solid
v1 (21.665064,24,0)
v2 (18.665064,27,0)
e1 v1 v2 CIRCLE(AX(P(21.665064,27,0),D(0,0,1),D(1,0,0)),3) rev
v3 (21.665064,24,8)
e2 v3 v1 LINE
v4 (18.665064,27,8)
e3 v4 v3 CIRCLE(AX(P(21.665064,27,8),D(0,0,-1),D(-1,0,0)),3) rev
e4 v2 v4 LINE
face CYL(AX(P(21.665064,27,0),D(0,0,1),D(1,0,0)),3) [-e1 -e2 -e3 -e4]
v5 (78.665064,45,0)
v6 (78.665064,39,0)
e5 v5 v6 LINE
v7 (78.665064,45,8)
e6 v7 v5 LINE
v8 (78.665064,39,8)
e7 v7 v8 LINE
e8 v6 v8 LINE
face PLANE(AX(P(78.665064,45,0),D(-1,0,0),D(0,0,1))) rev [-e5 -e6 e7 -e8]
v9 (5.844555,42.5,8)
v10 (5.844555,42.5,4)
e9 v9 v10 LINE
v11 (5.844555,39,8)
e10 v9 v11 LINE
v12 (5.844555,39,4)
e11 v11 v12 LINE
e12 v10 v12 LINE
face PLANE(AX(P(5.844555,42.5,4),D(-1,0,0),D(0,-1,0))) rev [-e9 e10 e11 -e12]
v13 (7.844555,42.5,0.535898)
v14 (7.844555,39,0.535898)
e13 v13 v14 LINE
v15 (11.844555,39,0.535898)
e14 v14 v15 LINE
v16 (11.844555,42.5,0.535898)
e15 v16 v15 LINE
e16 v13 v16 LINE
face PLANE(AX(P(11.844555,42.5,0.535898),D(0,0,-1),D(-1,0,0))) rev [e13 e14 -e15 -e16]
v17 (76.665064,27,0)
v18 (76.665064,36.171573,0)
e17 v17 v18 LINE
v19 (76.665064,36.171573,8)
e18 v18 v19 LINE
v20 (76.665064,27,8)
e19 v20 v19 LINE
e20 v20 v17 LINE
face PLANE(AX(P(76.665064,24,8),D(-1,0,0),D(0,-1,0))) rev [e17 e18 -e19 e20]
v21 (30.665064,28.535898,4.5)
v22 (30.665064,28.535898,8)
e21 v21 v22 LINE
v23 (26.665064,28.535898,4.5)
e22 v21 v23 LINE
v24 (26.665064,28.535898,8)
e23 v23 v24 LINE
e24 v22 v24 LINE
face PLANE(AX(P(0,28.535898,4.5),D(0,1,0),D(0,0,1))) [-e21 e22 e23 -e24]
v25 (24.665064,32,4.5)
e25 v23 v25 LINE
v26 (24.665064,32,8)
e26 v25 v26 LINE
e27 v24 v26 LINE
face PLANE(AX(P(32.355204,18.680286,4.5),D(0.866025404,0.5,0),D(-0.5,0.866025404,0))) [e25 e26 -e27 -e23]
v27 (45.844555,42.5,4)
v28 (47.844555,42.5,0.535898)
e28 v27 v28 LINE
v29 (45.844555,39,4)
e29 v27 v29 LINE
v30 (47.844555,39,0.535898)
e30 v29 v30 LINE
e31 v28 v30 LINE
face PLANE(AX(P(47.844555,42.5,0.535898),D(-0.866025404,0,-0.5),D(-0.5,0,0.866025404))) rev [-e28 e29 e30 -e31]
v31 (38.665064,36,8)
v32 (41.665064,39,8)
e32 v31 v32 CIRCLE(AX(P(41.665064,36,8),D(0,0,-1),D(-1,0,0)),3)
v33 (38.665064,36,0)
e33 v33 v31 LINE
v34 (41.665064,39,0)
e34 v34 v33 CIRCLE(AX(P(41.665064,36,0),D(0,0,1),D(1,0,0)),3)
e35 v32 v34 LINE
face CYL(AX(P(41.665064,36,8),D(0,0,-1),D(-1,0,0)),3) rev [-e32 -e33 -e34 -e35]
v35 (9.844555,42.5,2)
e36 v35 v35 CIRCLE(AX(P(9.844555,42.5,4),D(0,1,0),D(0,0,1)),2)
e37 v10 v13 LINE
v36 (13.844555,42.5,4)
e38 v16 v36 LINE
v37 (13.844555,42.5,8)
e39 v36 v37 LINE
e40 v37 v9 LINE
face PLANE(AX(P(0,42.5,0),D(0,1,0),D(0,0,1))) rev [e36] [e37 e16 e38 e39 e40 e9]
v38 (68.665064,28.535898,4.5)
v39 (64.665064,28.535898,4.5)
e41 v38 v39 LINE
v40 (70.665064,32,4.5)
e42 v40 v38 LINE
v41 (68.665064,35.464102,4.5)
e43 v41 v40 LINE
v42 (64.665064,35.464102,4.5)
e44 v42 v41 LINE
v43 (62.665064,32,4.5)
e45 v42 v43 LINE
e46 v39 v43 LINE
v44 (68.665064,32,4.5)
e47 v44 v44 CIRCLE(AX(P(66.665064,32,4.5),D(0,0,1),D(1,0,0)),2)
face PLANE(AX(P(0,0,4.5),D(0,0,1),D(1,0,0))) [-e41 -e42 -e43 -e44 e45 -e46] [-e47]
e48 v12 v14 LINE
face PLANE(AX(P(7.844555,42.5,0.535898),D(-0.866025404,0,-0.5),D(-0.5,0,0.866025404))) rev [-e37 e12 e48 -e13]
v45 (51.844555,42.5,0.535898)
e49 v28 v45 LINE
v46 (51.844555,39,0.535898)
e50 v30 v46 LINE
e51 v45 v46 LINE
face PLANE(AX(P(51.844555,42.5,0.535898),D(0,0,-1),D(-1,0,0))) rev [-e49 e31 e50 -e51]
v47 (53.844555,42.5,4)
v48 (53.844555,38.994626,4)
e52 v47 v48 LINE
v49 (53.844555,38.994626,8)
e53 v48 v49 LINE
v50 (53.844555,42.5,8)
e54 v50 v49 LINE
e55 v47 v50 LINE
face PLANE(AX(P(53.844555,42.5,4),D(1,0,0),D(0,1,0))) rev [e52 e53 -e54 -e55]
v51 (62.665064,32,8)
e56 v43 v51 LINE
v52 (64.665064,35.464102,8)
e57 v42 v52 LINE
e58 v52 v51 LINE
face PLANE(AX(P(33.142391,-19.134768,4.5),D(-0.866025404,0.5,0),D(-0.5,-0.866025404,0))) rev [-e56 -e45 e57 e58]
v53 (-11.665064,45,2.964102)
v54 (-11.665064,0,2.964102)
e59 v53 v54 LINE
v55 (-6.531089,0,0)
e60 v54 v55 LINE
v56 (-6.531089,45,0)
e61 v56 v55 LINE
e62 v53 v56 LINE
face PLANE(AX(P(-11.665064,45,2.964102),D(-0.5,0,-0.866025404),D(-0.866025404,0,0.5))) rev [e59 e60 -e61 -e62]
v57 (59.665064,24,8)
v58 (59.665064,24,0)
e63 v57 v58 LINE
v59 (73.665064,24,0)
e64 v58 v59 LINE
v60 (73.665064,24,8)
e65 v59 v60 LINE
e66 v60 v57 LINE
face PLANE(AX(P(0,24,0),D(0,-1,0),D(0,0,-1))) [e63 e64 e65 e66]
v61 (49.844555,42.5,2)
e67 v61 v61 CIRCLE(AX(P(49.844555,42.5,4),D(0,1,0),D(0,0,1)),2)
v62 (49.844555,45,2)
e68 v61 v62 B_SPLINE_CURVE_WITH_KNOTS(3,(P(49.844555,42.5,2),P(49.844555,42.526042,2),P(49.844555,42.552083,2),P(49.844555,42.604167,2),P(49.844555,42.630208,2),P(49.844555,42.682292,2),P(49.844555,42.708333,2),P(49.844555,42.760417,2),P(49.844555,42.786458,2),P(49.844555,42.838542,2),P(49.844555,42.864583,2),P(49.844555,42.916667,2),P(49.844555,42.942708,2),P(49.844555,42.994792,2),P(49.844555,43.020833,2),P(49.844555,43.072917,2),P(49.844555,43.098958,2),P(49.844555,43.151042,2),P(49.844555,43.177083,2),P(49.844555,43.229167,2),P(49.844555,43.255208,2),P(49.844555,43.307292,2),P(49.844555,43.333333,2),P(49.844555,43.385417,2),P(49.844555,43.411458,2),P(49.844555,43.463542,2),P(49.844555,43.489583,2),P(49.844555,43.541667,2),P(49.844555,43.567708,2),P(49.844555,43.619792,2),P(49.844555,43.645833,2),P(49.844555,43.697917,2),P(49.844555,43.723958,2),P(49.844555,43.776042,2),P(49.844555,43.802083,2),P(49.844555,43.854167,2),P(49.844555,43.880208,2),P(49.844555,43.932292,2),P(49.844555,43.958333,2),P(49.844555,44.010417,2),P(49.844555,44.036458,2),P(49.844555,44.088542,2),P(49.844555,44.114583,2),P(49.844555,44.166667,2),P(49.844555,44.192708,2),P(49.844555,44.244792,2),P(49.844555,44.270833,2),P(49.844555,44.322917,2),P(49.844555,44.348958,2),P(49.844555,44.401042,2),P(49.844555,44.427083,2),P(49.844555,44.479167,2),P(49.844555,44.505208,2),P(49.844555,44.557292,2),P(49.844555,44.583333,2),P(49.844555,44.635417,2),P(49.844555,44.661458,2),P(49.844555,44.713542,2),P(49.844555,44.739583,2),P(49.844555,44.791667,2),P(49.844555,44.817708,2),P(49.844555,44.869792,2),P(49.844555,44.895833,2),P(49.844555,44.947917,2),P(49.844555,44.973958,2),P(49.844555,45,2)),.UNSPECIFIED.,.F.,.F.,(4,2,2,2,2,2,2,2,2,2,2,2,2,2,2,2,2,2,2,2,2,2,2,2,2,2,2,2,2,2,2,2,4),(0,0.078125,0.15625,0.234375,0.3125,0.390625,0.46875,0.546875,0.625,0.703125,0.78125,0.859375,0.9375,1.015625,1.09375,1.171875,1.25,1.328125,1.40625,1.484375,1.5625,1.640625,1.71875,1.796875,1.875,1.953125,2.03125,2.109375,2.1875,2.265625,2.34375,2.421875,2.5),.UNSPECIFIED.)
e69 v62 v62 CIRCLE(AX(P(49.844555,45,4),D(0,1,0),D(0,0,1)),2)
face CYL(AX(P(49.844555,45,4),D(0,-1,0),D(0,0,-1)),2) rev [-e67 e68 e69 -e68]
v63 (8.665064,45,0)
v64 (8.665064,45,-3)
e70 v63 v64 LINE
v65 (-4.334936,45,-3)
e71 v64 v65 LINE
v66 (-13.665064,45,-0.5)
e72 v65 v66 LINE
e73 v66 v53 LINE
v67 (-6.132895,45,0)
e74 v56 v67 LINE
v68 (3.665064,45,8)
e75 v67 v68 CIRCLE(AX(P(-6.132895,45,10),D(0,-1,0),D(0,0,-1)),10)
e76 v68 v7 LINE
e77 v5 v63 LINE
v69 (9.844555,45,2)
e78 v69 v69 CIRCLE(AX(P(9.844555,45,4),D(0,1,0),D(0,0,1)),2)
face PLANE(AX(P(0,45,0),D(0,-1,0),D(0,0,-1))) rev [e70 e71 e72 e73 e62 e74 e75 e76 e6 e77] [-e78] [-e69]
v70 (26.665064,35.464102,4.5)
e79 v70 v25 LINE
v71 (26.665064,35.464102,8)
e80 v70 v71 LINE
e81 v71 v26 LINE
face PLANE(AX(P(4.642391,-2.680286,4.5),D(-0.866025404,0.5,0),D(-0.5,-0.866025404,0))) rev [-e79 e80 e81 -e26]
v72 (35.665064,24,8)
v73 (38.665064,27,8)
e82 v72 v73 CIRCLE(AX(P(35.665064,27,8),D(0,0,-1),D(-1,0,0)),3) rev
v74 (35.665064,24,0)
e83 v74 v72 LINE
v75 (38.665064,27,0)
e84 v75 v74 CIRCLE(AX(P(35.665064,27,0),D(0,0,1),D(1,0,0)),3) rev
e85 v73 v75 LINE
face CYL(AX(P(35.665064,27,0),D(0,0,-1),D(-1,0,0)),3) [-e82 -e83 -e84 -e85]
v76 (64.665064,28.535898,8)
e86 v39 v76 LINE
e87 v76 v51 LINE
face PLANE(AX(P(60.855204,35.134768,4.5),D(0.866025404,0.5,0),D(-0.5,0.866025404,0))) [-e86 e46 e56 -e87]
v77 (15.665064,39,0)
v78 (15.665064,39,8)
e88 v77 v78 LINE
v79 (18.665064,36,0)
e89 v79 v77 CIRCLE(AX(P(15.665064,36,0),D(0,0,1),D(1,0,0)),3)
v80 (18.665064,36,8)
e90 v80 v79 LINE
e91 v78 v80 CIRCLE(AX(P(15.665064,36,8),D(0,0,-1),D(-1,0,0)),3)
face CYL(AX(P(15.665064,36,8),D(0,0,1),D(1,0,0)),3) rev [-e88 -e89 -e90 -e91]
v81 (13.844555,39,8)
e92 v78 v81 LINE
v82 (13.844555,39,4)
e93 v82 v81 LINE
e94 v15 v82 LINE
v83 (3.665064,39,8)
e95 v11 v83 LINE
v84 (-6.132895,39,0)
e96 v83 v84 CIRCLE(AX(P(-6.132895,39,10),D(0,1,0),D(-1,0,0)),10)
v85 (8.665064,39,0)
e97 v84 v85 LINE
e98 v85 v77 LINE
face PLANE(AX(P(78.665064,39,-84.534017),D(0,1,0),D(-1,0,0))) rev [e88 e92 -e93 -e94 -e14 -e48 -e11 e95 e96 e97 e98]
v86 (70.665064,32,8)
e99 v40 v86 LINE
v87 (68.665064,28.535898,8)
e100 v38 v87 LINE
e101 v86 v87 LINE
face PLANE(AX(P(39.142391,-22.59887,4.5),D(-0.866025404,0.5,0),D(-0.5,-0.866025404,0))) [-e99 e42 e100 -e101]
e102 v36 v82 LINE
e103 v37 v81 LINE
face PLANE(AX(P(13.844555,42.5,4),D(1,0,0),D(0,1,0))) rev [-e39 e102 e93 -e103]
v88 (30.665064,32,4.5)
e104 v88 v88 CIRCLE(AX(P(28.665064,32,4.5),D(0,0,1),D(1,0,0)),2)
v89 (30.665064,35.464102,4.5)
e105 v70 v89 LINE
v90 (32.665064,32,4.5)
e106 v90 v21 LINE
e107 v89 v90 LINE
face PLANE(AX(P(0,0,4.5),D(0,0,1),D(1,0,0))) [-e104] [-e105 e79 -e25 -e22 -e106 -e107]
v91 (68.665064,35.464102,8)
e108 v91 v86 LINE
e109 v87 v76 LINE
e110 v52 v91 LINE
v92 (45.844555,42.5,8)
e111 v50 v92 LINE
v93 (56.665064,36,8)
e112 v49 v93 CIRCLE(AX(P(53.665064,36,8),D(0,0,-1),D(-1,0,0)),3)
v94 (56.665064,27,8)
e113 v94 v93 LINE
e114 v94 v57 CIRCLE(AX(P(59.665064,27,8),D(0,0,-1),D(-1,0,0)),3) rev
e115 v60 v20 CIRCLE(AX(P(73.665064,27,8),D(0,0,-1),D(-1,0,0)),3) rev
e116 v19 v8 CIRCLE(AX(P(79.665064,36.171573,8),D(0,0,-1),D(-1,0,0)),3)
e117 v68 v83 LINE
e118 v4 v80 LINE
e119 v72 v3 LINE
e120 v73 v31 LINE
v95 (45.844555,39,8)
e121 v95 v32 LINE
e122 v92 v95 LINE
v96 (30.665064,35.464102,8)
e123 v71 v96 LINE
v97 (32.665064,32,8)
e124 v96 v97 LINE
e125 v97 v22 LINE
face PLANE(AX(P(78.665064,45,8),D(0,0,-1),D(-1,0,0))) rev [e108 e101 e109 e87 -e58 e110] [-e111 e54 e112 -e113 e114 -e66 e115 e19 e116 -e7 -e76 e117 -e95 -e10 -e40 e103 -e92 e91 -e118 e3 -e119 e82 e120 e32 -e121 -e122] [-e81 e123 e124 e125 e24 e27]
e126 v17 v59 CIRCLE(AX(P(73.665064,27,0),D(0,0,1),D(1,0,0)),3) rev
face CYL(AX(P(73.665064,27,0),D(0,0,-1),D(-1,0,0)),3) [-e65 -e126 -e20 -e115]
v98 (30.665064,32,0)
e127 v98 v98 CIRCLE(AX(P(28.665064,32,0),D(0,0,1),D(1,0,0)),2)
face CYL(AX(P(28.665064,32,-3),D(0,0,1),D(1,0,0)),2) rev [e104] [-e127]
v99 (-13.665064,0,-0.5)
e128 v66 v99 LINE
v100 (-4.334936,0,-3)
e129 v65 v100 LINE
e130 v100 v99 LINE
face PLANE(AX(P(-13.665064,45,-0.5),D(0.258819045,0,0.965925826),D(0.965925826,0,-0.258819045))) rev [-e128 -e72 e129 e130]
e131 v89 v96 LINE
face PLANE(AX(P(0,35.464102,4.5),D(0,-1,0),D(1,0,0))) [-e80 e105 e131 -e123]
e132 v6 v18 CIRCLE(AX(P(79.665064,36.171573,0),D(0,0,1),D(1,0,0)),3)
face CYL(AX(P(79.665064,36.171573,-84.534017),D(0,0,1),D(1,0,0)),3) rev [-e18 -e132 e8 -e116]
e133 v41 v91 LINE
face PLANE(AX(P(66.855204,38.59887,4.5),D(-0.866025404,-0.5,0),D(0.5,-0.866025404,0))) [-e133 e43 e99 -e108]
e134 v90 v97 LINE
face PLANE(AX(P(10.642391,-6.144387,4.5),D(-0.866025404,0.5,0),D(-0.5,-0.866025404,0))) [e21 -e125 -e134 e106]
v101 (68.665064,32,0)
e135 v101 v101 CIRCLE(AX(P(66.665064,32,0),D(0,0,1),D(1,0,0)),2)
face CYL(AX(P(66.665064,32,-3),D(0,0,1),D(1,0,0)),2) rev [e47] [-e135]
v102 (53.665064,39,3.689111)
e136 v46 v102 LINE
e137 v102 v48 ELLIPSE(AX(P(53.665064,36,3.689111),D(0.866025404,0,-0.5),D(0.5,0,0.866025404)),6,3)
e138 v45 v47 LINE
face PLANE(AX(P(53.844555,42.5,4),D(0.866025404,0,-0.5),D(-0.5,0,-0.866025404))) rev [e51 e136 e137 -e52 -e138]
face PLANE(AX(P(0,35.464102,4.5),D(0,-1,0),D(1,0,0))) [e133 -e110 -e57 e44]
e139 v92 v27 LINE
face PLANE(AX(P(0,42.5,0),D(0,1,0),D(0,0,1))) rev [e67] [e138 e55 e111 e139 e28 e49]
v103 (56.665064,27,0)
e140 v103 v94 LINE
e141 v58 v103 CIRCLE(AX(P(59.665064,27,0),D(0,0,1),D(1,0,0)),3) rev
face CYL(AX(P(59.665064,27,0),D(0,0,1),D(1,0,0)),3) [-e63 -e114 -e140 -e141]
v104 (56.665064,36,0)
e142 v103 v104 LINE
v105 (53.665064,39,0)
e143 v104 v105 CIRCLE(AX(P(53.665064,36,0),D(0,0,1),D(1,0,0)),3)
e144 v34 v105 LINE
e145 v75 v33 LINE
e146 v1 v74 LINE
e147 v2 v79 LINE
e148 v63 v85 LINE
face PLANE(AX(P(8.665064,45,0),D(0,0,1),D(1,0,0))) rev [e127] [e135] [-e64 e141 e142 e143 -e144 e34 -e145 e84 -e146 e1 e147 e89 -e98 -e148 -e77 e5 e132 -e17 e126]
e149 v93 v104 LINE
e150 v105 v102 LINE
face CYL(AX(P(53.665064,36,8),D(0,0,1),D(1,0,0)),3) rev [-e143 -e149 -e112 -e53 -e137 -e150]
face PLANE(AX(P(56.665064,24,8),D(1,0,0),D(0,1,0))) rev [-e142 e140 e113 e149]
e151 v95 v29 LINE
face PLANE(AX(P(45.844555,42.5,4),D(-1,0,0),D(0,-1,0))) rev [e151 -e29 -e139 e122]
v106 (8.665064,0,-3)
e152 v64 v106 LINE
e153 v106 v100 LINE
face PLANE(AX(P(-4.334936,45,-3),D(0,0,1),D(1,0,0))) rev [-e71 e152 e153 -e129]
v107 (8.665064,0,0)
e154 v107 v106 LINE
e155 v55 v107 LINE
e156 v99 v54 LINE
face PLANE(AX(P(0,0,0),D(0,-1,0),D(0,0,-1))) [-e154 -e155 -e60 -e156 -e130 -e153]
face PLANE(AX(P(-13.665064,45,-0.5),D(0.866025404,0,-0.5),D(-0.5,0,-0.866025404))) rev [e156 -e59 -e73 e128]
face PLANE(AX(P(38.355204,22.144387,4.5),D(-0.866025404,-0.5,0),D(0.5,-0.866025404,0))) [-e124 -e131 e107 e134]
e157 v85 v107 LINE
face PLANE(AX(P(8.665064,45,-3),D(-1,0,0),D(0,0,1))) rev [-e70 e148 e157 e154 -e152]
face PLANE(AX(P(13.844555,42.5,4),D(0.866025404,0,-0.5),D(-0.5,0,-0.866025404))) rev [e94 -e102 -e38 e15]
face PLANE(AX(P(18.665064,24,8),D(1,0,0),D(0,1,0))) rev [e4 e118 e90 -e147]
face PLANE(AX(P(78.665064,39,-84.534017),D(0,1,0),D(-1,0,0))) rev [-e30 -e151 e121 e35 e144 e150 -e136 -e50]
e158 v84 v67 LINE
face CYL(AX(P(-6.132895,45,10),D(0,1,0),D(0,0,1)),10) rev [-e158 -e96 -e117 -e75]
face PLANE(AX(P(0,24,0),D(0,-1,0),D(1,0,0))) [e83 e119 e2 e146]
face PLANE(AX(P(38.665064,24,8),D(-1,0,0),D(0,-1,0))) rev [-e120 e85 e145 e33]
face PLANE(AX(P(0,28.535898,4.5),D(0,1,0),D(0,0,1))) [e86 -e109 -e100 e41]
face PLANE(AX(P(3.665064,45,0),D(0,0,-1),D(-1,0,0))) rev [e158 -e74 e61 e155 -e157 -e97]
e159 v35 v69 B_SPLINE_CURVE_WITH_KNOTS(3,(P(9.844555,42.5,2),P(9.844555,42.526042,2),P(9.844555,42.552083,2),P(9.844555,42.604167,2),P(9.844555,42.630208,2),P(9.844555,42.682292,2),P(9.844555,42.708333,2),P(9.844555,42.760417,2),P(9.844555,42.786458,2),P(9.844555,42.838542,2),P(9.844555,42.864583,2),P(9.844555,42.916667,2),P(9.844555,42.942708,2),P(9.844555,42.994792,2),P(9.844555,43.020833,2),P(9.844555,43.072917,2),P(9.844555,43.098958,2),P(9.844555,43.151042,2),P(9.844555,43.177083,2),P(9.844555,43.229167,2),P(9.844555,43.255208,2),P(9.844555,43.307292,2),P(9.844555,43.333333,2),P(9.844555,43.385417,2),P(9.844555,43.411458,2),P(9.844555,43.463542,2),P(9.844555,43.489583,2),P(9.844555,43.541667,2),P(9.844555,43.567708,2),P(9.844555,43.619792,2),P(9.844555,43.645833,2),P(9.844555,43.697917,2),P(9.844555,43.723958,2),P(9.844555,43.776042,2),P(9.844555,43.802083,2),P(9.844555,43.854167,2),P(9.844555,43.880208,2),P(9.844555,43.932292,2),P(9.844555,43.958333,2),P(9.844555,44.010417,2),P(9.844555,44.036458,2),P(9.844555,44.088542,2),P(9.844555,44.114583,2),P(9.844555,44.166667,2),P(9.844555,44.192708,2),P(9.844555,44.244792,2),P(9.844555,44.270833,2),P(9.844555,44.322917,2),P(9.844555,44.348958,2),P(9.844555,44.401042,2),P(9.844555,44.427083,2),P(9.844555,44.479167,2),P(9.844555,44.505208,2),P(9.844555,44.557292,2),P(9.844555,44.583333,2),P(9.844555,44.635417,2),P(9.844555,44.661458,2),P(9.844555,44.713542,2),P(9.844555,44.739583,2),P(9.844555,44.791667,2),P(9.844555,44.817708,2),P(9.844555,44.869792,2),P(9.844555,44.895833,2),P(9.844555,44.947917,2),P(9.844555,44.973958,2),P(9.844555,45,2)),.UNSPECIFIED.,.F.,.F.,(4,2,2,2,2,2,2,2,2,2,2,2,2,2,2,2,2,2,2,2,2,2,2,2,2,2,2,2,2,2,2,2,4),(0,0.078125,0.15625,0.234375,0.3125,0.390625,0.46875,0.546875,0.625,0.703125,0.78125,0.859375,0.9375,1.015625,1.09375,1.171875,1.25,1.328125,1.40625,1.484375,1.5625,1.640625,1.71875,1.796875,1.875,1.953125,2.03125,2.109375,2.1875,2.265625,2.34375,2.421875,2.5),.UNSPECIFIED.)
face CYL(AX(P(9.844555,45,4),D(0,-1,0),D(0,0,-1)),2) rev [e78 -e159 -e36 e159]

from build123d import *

# Parameters (mm, degrees)
ESQUISSE1_R             = 2
BOSS_EXTRU_1_DEPTH      = 45
ESQUISSE2_W             = 75
ESQUISSE2_H             = 39
ENL_V_MAT_EXTRU_1_DEPTH = 8
ENL_V_MAT_EXTRU_2_DEPTH = 3.5
CONG_1_R                = 10
ESQUISSE4_W             = 20
ESQUISSE4_H             = 8
BOSS_EXTRU_2_DEPTH      = 15
CONG_3_R                = 3
ENL_V_MAT_EXTRU_3_DEPTH = 3.5
ESQUISSE6_R             = 2
ENL_V_MAT_EXTRU_4_DEPTH = 91.936473524


with BuildPart() as part:
    # Esquisse1 → Boss.-Extru.1 (new body)
    with BuildSketch(Plane(origin=(0, 0, 0), x_dir=(1, 0, 0), z_dir=(0, 1, 0))):
        Polygon((-13.665063509, 0.5), (-11.665063509, -2.964101615), (-6.531088913, 0), (3.665063509, 0), (3.665063509, -8), (78.665063509, -8), (78.665063509, 0), (8.665063509, 0), (8.665063509, 3), (-4.334936491, 3), align=None)
        with Locations(Location((49.844555434, -4, 0), (0, 0, 90))):
            Circle(ESQUISSE1_R, mode=Mode.SUBTRACT)
        with Locations(Location((9.844555434, -4, 0), (0, 0, 90))):
            Circle(ESQUISSE1_R, mode=Mode.SUBTRACT)
    extrude(amount=BOSS_EXTRU_1_DEPTH)

    # Esquisse2 → Enlèv. mat.-Extru.1 (cut)
    with BuildSketch(Plane.XY.offset(8)):
        with Locations((41.165063509, 19.5)):
            Rectangle(ESQUISSE2_W, ESQUISSE2_H)
    extrude(amount=-ENL_V_MAT_EXTRU_1_DEPTH, mode=Mode.SUBTRACT)

    # Esquisse3 → Enlèv. mat.-Extru.2 (cut)
    with BuildSketch(Plane.XZ.offset(-39)):
        Polygon((51.844555434, 0.535898385), (47.844555434, 0.535898385), (45.844555434, 4), (45.844555434, 8), (53.844555434, 8), (53.844555434, 4), align=None)
        Polygon((11.844555434, 0.535898385), (7.844555434, 0.535898385), (5.844555434, 4), (5.844555434, 8), (13.844555434, 8), (13.844555434, 4), align=None)
    extrude(amount=-ENL_V_MAT_EXTRU_2_DEPTH, mode=Mode.SUBTRACT)

    # Congé1
    # the kernel refuses this fillet: 10 mm, written as the material it adds along each edge
    with BuildSketch(Plane(origin=(3.665063509, 39, 0), x_dir=(-1, 0, 0), z_dir=(0, 1, 0))) as cong_1_piece_1:
        with BuildLine():
            CenterArc((9.797958971, 10), CONG_1_R, 191.536959033, 78.463040967)
            Line((0, 8), (-0.195959179, 7.96))
            ThreePointArc((-0.195959179, 7.96), (-0.2, 4), (-0.2, 0))
            Line((-0.2, 0), (0, -0.2))
            Line((0, -0.2), (9.797958971, -0.2))
            Line((9.797958971, -0.2), (9.797958971, 0))
        make_face()
    extrude(amount=6)

    # Esquisse4 → Boss.-Extru.2 (add)
    with BuildSketch(Plane.XZ.offset(-39)):
        with Locations((28.665063509, 4)):
            Rectangle(ESQUISSE4_W, ESQUISSE4_H)
        with Locations((66.665063509, 4)):
            Rectangle(ESQUISSE4_W, ESQUISSE4_H)
    extrude(amount=BOSS_EXTRU_2_DEPTH)

    # Congé3
    # the kernel refuses this fillet: 3 mm, written as the material it adds along each edge
    with BuildSketch(Plane(origin=(18.665063509, 39, 0), x_dir=(-1, 0, 0), z_dir=(0, 0, 1)), Plane(origin=(38.665063509, 39, 8), x_dir=(1, 0, 0), z_dir=(0, 0, -1))) as cong_3_piece_1:
        with BuildLine():
            CenterArc((CONG_3_R, CONG_3_R), CONG_3_R, 180, 90)
            Line((0, CONG_3_R), (0, 0))
            Line((0, 0), (CONG_3_R, 0))
        make_face()
    extrude(amount=8)
    with BuildSketch(Plane(origin=(76.665063509, 39, 8), x_dir=(1, 0, 0), z_dir=(0, 0, -1))) as cong_3_piece_2:
        with BuildLine():
            CenterArc((3, 2.828427125), CONG_3_R, 180, 70.528779366)
            Line((0, 2.828427125), (0, 0))
            Line((0, 0), (2, 0))
        make_face()
    extrude(amount=8)
    with BuildSketch(Plane(origin=(56.665063509, 39, 0), x_dir=(-1, 0, 0), z_dir=(0, 0, 1))) as cong_3_piece_3_section:
        with BuildLine():
            CenterArc((CONG_3_R, CONG_3_R), CONG_3_R, 180, 90)
            Line((0, CONG_3_R), (0, 0))
            Line((0, 0), (CONG_3_R, 0))
        make_face()
    cong_3_piece_3 = extrude(amount=8, mode=Mode.PRIVATE)
    cong_3_piece_3 = split(cong_3_piece_3, bisect_by=Plane(origin=(52.817631645, 39, 2.221315823), z_dir=(0.8660254037844395, 0, -0.4999999999999987)), keep=Keep.TOP, mode=Mode.PRIVATE)
    add(cong_3_piece_3)
    with BuildSketch(Plane(origin=(56.665063509, 39, -7.5), x_dir=(-1, 0, 0), z_dir=(0, 0, 1))) as cong_3_piece_4_section:
        with BuildLine():
            CenterArc((CONG_3_R, CONG_3_R), CONG_3_R, 180, 90)
            Line((0, CONG_3_R), (0, 0))
            Line((0, 0), (CONG_3_R, 0))
        make_face()
    cong_3_piece_4 = extrude(amount=15.5, mode=Mode.PRIVATE)
    cong_3_piece_4 = split(cong_3_piece_4, bisect_by=Plane(origin=(53.844555434, 39, -7.5), z_dir=(1, 0, 0)), keep=Keep.TOP, mode=Mode.PRIVATE)
    cong_3_piece_4 = split(cong_3_piece_4, bisect_by=Plane(origin=(49.570036381, 39, -3.403684177), z_dir=(-0.8660254037844395, 0, 0.4999999999999987)), keep=Keep.TOP, mode=Mode.PRIVATE)
    add(cong_3_piece_4)
    # the kernel refuses this fillet: 3 mm, written as the material it takes off along each edge
    with BuildSketch(Plane(origin=(76.665063509, 24, 15.5), x_dir=(-1, 0, 0), z_dir=(0, 0, -1)), Plane(origin=(18.665063509, 24, -7.5), x_dir=(1, 0, 0), z_dir=(0, 0, 1))) as cong_3_2_piece_1:
        with BuildLine():
            CenterArc((CONG_3_R, CONG_3_R), CONG_3_R, 180, 90)
            Line((0, CONG_3_R), (0, 0))
            Line((0, 0), (CONG_3_R, 0))
        make_face()
    extrude(amount=23, mode=Mode.SUBTRACT)
    with BuildSketch(Plane(origin=(56.665063509, 24, -7.5), x_dir=(0, 1, 0), z_dir=(0, 0, 1)), Plane(origin=(38.665063509, 24, 15.5), x_dir=(0, 1, 0), z_dir=(0, 0, -1))) as cong_3_2_piece_2:
        with BuildLine():
            CenterArc((CONG_3_R, -CONG_3_R), CONG_3_R, 90, 90)
            Line((0, -CONG_3_R), (0, 0))
            Line((0, 0), (CONG_3_R, 0))
        make_face()
    extrude(amount=23, mode=Mode.SUBTRACT)

    # Esquisse5 → Enlèv. mat.-Extru.3 (cut)
    with BuildSketch(Plane.XY.offset(8)):
        Polygon((32.665063509, 32), (30.665063509, 28.535898385), (26.665063509, 28.535898385), (24.665063509, 32), (26.665063509, 35.464101615), (30.665063509, 35.464101615), align=None)
        Polygon((70.665063509, 32), (68.665063509, 28.535898385), (64.665063509, 28.535898385), (62.665063509, 32), (64.665063509, 35.464101615), (68.665063509, 35.464101615), align=None)
    extrude(amount=-ENL_V_MAT_EXTRU_3_DEPTH, mode=Mode.SUBTRACT)

    # Esquisse6 → Enlèv. mat.-Extru.4 (cut, through all)
    with BuildSketch(Plane.XY.offset(4.5)):
        with Locations((28.665063509, 32)):
            Circle(ESQUISSE6_R)
        with Locations((66.665063509, 32)):
            Circle(ESQUISSE6_R)
    extrude(amount=-ENL_V_MAT_EXTRU_4_DEPTH, mode=Mode.SUBTRACT)


solid = part.part
